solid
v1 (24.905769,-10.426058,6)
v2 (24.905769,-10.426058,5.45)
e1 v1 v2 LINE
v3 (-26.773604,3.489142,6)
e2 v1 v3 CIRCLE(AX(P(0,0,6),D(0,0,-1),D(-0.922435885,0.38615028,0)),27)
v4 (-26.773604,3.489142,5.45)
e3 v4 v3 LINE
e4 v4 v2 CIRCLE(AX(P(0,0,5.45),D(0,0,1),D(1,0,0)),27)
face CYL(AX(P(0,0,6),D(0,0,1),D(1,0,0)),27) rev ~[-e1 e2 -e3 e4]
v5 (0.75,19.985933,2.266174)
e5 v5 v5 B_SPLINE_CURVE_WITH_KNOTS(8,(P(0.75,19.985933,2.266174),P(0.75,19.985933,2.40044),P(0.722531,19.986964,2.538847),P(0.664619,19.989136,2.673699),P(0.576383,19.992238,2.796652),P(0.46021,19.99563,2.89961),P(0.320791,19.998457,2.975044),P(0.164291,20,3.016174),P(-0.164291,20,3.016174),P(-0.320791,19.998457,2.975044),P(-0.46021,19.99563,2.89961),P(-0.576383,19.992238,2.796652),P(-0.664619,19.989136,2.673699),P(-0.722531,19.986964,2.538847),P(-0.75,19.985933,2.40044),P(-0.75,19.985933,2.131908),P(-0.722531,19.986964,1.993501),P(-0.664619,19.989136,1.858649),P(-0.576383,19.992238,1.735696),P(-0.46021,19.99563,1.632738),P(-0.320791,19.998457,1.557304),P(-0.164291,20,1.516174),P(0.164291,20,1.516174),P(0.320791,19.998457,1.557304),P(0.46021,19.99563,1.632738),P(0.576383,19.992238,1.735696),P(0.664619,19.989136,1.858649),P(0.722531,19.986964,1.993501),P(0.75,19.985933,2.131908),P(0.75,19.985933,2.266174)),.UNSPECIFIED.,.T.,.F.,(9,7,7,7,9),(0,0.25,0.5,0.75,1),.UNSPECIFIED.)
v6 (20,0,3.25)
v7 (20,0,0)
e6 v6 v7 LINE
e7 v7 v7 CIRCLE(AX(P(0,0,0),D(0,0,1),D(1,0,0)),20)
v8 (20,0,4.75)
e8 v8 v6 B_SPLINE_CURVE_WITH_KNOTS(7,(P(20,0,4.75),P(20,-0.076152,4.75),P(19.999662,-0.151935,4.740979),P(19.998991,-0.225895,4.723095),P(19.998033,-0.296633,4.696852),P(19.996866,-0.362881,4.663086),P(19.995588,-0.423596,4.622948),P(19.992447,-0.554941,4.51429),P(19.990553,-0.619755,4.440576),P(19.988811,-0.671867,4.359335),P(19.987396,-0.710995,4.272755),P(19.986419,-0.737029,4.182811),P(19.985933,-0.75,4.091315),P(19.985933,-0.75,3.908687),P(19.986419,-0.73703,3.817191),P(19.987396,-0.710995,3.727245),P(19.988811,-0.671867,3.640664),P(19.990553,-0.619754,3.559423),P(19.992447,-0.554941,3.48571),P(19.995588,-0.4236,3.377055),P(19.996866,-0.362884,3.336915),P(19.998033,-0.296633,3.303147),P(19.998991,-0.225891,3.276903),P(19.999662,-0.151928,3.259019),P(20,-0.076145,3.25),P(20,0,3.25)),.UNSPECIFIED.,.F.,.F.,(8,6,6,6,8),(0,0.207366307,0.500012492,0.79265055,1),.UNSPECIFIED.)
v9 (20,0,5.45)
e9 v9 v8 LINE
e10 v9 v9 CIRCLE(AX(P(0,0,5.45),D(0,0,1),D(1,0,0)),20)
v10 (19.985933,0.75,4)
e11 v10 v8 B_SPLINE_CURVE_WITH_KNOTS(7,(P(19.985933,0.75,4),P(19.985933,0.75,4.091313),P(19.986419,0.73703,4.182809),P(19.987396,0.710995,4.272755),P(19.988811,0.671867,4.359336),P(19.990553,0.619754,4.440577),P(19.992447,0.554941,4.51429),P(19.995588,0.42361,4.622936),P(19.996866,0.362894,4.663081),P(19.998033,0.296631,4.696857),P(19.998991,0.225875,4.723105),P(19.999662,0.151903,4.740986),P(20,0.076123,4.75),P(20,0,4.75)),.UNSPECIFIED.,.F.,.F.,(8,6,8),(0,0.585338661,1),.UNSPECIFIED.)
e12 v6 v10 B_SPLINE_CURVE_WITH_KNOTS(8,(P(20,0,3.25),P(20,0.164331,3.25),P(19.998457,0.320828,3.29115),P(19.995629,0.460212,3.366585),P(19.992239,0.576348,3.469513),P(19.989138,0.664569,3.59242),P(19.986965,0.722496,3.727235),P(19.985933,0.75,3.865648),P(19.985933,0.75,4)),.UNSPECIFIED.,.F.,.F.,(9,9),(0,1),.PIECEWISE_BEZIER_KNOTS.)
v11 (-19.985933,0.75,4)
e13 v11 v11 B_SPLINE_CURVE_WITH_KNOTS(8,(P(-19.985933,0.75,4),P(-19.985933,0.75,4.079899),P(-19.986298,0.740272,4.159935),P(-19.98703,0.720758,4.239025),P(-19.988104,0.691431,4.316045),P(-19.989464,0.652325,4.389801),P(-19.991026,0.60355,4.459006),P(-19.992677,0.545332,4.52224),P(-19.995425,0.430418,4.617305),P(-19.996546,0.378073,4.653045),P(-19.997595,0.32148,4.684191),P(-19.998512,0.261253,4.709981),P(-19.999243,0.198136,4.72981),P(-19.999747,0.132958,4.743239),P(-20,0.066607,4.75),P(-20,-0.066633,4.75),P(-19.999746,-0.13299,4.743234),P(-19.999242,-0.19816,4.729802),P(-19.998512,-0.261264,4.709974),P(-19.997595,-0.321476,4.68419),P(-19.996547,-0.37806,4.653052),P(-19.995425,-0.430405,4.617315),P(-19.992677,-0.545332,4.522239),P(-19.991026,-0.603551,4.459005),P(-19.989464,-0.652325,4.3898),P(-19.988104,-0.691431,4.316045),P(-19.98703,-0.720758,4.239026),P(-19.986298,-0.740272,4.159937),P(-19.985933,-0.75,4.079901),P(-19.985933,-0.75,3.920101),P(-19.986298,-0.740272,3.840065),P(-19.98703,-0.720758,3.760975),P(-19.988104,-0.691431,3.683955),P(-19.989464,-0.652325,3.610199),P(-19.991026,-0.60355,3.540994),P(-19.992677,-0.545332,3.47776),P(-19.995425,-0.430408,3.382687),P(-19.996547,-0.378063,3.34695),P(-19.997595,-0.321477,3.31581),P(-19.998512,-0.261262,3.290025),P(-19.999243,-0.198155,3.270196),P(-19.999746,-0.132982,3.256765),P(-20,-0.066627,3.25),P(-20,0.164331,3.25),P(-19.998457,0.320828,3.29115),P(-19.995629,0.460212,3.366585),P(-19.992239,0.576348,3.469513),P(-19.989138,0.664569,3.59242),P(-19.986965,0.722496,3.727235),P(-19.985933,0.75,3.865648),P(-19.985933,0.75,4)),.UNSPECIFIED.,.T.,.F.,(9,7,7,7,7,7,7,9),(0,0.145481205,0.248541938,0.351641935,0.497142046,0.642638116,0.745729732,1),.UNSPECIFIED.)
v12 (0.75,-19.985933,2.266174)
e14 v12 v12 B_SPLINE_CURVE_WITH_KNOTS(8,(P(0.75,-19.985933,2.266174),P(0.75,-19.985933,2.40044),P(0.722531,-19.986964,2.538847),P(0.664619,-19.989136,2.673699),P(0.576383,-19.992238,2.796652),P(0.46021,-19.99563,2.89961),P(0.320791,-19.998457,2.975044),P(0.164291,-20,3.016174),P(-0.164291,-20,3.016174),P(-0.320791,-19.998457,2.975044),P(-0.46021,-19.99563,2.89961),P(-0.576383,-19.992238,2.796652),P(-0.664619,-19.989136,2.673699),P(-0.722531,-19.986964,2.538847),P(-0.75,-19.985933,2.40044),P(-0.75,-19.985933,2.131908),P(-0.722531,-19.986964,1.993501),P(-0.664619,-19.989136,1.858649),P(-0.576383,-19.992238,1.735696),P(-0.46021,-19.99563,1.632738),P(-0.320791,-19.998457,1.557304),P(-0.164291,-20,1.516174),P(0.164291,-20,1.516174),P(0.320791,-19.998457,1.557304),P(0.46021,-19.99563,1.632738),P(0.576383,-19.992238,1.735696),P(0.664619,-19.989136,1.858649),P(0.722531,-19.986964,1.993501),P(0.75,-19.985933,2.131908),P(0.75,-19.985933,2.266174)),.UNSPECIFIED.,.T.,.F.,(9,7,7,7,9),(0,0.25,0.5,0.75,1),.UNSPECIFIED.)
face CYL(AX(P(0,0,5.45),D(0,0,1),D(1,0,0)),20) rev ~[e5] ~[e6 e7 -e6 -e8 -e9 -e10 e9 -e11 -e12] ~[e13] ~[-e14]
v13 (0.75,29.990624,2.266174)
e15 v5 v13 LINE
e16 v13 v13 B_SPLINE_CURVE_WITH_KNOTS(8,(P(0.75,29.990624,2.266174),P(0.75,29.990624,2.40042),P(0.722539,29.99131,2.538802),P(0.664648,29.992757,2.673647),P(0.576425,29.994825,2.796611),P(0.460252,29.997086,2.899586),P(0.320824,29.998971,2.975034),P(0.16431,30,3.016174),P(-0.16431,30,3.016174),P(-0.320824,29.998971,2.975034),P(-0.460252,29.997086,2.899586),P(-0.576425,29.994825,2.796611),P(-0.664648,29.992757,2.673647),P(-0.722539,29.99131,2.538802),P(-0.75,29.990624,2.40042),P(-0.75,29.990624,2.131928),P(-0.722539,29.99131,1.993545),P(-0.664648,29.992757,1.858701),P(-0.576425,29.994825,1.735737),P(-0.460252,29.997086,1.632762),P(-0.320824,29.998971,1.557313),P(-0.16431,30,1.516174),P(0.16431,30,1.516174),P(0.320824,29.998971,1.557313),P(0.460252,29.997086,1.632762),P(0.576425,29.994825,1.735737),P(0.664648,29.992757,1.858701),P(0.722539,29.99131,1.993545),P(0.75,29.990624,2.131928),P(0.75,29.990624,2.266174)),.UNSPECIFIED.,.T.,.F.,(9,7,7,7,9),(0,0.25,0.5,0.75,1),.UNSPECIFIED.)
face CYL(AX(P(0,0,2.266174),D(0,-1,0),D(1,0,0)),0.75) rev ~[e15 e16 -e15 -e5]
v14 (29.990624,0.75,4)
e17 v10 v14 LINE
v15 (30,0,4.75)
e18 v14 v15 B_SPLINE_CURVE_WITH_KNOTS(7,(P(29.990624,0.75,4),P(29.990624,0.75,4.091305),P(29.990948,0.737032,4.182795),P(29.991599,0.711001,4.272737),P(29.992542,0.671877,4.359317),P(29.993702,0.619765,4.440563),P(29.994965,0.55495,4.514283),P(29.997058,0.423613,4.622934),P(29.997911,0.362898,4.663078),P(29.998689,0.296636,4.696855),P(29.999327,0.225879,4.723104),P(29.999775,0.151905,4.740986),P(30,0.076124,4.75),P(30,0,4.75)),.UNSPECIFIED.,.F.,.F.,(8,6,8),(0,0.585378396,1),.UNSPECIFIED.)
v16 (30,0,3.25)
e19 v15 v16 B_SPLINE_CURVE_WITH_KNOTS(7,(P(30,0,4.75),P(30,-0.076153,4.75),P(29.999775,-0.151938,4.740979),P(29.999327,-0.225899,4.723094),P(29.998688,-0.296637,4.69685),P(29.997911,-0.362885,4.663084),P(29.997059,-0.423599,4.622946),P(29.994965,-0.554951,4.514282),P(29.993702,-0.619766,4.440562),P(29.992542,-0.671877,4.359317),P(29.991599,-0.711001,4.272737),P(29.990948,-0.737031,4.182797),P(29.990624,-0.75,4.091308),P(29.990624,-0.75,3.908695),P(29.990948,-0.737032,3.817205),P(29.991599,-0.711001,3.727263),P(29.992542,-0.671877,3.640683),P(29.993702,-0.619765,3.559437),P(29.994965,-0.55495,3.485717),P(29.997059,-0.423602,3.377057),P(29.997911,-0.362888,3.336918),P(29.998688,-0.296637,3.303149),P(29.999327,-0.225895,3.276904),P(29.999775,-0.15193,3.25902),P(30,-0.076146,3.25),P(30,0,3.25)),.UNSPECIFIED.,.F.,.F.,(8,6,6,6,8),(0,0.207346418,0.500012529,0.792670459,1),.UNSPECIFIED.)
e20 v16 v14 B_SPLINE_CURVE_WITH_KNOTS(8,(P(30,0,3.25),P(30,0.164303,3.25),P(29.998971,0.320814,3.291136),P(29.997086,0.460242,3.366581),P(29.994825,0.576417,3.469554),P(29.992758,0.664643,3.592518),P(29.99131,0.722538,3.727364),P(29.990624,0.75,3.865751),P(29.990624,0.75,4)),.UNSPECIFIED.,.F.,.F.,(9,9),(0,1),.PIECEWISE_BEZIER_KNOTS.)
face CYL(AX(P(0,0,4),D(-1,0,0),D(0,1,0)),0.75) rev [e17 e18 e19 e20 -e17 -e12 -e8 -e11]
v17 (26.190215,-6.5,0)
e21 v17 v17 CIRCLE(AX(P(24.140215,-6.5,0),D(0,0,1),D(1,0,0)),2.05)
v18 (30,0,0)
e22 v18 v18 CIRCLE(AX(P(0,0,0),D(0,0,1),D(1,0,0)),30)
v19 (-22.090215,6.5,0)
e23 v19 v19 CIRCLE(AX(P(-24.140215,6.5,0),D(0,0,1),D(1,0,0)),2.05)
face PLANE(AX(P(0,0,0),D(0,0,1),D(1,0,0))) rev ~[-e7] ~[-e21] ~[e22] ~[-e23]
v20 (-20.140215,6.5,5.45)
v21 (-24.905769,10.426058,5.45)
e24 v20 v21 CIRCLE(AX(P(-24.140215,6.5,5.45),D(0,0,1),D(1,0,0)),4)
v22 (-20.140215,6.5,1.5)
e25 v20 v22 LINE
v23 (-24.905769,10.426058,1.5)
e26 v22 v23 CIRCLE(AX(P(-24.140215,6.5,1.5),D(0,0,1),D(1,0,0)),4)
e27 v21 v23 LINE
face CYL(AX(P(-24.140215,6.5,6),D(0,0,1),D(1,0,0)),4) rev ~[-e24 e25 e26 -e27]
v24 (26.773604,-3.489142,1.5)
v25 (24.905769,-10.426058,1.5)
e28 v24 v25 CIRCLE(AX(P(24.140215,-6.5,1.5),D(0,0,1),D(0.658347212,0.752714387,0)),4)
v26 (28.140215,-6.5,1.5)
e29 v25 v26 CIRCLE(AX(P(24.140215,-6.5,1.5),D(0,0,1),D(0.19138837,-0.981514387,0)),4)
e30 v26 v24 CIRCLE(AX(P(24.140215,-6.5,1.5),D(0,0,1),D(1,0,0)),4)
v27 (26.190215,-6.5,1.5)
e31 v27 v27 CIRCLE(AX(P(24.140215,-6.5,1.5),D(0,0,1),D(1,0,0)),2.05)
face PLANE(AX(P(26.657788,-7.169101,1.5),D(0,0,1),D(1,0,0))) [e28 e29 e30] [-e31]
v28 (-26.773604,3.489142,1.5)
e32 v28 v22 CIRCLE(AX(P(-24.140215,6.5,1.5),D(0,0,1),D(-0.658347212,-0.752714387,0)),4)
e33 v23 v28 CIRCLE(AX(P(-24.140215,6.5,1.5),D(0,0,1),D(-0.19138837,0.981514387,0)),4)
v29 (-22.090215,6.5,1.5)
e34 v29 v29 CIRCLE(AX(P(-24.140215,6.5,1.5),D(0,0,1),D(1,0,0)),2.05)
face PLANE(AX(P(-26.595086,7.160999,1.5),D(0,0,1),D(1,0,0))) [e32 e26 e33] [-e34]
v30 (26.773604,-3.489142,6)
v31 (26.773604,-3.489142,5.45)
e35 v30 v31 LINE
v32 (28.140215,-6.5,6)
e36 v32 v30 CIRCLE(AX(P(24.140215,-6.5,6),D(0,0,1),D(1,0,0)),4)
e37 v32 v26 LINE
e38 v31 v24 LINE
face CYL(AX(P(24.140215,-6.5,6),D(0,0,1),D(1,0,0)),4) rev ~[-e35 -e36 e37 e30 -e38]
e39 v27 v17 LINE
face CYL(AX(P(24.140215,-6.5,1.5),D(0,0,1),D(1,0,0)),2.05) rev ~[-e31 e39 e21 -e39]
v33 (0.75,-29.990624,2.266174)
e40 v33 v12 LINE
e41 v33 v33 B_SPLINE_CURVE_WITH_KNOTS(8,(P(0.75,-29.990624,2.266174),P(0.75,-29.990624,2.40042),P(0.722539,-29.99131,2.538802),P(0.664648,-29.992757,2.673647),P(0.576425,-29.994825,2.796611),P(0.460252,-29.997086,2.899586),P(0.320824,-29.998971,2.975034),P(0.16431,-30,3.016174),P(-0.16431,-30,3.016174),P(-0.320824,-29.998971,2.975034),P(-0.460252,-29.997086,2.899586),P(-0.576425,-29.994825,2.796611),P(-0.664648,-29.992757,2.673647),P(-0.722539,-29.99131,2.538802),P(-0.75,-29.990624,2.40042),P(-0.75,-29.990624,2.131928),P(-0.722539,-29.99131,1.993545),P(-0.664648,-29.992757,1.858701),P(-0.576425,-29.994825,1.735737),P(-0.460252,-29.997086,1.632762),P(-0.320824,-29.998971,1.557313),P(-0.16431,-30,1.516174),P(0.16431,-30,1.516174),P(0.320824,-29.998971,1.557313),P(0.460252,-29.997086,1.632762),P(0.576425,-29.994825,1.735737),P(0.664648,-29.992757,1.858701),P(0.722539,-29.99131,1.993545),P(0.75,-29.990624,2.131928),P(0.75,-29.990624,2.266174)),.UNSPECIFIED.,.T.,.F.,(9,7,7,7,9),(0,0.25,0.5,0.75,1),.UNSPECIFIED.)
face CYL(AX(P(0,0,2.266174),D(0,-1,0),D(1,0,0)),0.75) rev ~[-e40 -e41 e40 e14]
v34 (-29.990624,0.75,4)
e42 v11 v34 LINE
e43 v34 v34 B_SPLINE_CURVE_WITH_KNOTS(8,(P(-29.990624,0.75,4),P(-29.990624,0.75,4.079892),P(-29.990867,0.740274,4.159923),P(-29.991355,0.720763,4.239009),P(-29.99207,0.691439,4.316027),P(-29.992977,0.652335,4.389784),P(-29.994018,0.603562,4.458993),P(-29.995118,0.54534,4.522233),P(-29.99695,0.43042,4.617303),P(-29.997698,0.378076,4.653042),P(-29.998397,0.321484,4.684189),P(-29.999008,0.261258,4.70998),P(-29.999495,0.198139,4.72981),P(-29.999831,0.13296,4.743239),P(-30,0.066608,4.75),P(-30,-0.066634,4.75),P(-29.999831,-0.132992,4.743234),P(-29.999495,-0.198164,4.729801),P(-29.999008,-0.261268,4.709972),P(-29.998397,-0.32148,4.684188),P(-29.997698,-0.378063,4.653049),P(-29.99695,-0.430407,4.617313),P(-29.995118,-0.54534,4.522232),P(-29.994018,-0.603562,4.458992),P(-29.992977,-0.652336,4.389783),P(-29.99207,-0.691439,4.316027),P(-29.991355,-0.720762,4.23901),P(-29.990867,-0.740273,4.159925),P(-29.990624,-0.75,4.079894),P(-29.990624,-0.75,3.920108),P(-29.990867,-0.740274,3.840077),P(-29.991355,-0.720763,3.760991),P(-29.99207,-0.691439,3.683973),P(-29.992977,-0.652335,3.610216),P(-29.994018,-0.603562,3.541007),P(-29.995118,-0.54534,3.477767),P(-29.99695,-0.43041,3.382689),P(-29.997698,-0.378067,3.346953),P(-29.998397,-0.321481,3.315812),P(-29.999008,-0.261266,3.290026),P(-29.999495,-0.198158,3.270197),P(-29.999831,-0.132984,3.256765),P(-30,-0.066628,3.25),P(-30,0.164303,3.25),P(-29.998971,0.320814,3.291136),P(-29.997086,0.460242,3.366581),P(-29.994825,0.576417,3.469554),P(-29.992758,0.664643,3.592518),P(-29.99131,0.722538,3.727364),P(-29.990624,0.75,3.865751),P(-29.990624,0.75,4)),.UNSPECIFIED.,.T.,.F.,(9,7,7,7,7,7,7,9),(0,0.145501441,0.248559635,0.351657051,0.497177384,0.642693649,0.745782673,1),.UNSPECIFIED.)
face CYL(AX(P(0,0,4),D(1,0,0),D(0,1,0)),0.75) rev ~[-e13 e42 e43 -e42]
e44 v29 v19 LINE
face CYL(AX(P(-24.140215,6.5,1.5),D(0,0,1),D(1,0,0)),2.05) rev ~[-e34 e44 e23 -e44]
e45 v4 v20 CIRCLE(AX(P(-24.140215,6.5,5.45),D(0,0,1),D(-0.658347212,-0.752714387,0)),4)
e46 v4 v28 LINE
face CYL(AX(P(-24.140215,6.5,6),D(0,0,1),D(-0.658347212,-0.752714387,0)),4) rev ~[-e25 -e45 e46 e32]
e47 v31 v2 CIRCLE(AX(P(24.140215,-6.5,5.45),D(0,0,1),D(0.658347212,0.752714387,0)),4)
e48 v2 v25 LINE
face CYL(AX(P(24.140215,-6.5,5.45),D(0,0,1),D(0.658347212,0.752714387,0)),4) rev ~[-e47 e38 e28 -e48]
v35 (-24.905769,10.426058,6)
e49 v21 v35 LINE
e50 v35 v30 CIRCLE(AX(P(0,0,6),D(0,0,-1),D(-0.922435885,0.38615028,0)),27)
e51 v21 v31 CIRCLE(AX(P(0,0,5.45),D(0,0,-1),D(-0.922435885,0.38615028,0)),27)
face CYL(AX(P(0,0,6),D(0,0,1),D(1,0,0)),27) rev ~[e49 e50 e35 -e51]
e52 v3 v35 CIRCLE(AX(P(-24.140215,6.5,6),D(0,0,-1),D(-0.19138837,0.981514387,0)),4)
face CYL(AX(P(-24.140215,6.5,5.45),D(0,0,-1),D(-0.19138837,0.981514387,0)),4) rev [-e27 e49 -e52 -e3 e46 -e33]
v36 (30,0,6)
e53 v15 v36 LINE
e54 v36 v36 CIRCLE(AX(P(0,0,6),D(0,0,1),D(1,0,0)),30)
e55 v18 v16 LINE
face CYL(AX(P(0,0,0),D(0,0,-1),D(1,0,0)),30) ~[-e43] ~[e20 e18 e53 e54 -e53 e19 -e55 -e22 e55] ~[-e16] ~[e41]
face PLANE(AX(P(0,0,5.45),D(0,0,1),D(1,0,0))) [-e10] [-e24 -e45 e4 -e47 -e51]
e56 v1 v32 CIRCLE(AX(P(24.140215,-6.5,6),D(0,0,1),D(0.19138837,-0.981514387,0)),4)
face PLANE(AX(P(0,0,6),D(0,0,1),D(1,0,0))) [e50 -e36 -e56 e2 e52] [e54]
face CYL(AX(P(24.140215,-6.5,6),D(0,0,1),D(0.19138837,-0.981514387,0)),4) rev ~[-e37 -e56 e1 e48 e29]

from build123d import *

# Parameters (mm, degrees)
F0_R           = 30
F1_DEPTH       = 6
F2_R           = 27
F3_DEPTH       = 0.55
F4_R           = 0.75
F5_DEPTH       = 30.001
F5_DEPTH_BACK  = 30.001
F6_R           = 20
F7_DEPTH       = 5.4510001
F8_R           = 0.75
F9_DEPTH       = 30.0010001
F9_DEPTH_BACK  = 30.0010001
F11_DEPTH      = 3.95
F11_DEPTH_BACK = 0.5510001
F13_DEPTH      = 4.5
F14_R          = 2.05
F15_DEPTH      = 1.5010001


with BuildPart() as f1:
    # F0 (on Top) → F1 (new body)
    with BuildSketch(Plane.XY):
        Circle(F0_R)
    extrude(amount=F1_DEPTH)

    # F2 (on face) → F3 (cut)
    with BuildSketch(Plane.XY.offset(6)):
        Circle(F2_R)
    extrude(amount=-F3_DEPTH, mode=Mode.SUBTRACT)

    # F4 (on Front) → F5 (cut, two sides)
    with BuildSketch(Plane.XZ) as f5_sk:
        with Locations((0, 2.2661738681)):
            Circle(F4_R)
    extrude(amount=-F5_DEPTH, mode=Mode.SUBTRACT)
    extrude(f5_sk.sketch, amount=F5_DEPTH_BACK, mode=Mode.SUBTRACT)

    # F6 (on face) → F7 (cut, through all)
    with BuildSketch(Plane.XY.offset(5.45)):
        Circle(F6_R)
    extrude(amount=-F7_DEPTH, mode=Mode.SUBTRACT)

    # F8 (on Right) → F9 (cut, two sides)
    with BuildSketch(Plane.YZ) as f9_sk:
        with Locations((0, 4)):
            Circle(F8_R)
    extrude(amount=-F9_DEPTH, mode=Mode.SUBTRACT)
    extrude(f9_sk.sketch, amount=F9_DEPTH_BACK, mode=Mode.SUBTRACT)

    # F10 (on face) → F11 (cut, two sides)
    with BuildSketch(Plane.XY.offset(5.45)) as f11_sk:
        with BuildLine():
            ThreePointArc((-24.9057688902, 10.4260575477), (-28.0026498746, 7.54), (-26.7736042577, 3.4891424523))
            ThreePointArc((-26.7736042577, 3.4891424523), (-26.0714326419, 7.02), (-24.9057688902, 10.4260575477))
        make_face()
        with BuildLine():
            ThreePointArc((24.9057688902, -10.4260575477), (26.0714326419, -7.02), (26.7736042577, -3.4891424523))
            ThreePointArc((26.7736042577, -3.4891424523), (20.2777809437, -5.46), (24.9057688902, -10.4260575477))
        make_face()
    extrude(amount=-F11_DEPTH, mode=Mode.SUBTRACT)
    extrude(f11_sk.sketch, amount=F11_DEPTH_BACK, mode=Mode.SUBTRACT)

    # F12 (on face) → F13 (cut)
    with BuildSketch(Plane.XY.offset(6)):
        with BuildLine():
            ThreePointArc((-26.7736042577, 3.4891424523), (-22.4869694193, 2.8576411905), (-20.1402154091, 6.5))
            ThreePointArc((-20.1402154091, 6.5), (-21.5968135459, 9.587249093), (-24.9057688902, 10.4260575477))
            ThreePointArc((-24.9057688902, 10.4260575477), (-28.0026498746, 7.54), (-26.7736042577, 3.4891424523))
        make_face()
        with BuildLine():
            ThreePointArc((26.7736042577, -3.4891424523), (26.0714326419, -7.02), (24.9057688902, -10.4260575477))
            ThreePointArc((24.9057688902, -10.4260575477), (27.2274645021, -9.0434018632), (28.1402154091, -6.5))
            ThreePointArc((28.1402154091, -6.5), (27.7825742186, -4.8467540102), (26.7736042577, -3.4891424523))
        make_face()
    extrude(amount=-F13_DEPTH, mode=Mode.SUBTRACT)

    # F14 (on face) → F15 (cut, through all)
    with BuildSketch(Plane.XY.offset(1.5)):
        with Locations((-24.1402154091, 6.5)):
            Circle(F14_R)
        with Locations((24.1402154091, -6.5)):
            Circle(F14_R)
    extrude(amount=-F15_DEPTH, mode=Mode.SUBTRACT)


solid = f1.part
